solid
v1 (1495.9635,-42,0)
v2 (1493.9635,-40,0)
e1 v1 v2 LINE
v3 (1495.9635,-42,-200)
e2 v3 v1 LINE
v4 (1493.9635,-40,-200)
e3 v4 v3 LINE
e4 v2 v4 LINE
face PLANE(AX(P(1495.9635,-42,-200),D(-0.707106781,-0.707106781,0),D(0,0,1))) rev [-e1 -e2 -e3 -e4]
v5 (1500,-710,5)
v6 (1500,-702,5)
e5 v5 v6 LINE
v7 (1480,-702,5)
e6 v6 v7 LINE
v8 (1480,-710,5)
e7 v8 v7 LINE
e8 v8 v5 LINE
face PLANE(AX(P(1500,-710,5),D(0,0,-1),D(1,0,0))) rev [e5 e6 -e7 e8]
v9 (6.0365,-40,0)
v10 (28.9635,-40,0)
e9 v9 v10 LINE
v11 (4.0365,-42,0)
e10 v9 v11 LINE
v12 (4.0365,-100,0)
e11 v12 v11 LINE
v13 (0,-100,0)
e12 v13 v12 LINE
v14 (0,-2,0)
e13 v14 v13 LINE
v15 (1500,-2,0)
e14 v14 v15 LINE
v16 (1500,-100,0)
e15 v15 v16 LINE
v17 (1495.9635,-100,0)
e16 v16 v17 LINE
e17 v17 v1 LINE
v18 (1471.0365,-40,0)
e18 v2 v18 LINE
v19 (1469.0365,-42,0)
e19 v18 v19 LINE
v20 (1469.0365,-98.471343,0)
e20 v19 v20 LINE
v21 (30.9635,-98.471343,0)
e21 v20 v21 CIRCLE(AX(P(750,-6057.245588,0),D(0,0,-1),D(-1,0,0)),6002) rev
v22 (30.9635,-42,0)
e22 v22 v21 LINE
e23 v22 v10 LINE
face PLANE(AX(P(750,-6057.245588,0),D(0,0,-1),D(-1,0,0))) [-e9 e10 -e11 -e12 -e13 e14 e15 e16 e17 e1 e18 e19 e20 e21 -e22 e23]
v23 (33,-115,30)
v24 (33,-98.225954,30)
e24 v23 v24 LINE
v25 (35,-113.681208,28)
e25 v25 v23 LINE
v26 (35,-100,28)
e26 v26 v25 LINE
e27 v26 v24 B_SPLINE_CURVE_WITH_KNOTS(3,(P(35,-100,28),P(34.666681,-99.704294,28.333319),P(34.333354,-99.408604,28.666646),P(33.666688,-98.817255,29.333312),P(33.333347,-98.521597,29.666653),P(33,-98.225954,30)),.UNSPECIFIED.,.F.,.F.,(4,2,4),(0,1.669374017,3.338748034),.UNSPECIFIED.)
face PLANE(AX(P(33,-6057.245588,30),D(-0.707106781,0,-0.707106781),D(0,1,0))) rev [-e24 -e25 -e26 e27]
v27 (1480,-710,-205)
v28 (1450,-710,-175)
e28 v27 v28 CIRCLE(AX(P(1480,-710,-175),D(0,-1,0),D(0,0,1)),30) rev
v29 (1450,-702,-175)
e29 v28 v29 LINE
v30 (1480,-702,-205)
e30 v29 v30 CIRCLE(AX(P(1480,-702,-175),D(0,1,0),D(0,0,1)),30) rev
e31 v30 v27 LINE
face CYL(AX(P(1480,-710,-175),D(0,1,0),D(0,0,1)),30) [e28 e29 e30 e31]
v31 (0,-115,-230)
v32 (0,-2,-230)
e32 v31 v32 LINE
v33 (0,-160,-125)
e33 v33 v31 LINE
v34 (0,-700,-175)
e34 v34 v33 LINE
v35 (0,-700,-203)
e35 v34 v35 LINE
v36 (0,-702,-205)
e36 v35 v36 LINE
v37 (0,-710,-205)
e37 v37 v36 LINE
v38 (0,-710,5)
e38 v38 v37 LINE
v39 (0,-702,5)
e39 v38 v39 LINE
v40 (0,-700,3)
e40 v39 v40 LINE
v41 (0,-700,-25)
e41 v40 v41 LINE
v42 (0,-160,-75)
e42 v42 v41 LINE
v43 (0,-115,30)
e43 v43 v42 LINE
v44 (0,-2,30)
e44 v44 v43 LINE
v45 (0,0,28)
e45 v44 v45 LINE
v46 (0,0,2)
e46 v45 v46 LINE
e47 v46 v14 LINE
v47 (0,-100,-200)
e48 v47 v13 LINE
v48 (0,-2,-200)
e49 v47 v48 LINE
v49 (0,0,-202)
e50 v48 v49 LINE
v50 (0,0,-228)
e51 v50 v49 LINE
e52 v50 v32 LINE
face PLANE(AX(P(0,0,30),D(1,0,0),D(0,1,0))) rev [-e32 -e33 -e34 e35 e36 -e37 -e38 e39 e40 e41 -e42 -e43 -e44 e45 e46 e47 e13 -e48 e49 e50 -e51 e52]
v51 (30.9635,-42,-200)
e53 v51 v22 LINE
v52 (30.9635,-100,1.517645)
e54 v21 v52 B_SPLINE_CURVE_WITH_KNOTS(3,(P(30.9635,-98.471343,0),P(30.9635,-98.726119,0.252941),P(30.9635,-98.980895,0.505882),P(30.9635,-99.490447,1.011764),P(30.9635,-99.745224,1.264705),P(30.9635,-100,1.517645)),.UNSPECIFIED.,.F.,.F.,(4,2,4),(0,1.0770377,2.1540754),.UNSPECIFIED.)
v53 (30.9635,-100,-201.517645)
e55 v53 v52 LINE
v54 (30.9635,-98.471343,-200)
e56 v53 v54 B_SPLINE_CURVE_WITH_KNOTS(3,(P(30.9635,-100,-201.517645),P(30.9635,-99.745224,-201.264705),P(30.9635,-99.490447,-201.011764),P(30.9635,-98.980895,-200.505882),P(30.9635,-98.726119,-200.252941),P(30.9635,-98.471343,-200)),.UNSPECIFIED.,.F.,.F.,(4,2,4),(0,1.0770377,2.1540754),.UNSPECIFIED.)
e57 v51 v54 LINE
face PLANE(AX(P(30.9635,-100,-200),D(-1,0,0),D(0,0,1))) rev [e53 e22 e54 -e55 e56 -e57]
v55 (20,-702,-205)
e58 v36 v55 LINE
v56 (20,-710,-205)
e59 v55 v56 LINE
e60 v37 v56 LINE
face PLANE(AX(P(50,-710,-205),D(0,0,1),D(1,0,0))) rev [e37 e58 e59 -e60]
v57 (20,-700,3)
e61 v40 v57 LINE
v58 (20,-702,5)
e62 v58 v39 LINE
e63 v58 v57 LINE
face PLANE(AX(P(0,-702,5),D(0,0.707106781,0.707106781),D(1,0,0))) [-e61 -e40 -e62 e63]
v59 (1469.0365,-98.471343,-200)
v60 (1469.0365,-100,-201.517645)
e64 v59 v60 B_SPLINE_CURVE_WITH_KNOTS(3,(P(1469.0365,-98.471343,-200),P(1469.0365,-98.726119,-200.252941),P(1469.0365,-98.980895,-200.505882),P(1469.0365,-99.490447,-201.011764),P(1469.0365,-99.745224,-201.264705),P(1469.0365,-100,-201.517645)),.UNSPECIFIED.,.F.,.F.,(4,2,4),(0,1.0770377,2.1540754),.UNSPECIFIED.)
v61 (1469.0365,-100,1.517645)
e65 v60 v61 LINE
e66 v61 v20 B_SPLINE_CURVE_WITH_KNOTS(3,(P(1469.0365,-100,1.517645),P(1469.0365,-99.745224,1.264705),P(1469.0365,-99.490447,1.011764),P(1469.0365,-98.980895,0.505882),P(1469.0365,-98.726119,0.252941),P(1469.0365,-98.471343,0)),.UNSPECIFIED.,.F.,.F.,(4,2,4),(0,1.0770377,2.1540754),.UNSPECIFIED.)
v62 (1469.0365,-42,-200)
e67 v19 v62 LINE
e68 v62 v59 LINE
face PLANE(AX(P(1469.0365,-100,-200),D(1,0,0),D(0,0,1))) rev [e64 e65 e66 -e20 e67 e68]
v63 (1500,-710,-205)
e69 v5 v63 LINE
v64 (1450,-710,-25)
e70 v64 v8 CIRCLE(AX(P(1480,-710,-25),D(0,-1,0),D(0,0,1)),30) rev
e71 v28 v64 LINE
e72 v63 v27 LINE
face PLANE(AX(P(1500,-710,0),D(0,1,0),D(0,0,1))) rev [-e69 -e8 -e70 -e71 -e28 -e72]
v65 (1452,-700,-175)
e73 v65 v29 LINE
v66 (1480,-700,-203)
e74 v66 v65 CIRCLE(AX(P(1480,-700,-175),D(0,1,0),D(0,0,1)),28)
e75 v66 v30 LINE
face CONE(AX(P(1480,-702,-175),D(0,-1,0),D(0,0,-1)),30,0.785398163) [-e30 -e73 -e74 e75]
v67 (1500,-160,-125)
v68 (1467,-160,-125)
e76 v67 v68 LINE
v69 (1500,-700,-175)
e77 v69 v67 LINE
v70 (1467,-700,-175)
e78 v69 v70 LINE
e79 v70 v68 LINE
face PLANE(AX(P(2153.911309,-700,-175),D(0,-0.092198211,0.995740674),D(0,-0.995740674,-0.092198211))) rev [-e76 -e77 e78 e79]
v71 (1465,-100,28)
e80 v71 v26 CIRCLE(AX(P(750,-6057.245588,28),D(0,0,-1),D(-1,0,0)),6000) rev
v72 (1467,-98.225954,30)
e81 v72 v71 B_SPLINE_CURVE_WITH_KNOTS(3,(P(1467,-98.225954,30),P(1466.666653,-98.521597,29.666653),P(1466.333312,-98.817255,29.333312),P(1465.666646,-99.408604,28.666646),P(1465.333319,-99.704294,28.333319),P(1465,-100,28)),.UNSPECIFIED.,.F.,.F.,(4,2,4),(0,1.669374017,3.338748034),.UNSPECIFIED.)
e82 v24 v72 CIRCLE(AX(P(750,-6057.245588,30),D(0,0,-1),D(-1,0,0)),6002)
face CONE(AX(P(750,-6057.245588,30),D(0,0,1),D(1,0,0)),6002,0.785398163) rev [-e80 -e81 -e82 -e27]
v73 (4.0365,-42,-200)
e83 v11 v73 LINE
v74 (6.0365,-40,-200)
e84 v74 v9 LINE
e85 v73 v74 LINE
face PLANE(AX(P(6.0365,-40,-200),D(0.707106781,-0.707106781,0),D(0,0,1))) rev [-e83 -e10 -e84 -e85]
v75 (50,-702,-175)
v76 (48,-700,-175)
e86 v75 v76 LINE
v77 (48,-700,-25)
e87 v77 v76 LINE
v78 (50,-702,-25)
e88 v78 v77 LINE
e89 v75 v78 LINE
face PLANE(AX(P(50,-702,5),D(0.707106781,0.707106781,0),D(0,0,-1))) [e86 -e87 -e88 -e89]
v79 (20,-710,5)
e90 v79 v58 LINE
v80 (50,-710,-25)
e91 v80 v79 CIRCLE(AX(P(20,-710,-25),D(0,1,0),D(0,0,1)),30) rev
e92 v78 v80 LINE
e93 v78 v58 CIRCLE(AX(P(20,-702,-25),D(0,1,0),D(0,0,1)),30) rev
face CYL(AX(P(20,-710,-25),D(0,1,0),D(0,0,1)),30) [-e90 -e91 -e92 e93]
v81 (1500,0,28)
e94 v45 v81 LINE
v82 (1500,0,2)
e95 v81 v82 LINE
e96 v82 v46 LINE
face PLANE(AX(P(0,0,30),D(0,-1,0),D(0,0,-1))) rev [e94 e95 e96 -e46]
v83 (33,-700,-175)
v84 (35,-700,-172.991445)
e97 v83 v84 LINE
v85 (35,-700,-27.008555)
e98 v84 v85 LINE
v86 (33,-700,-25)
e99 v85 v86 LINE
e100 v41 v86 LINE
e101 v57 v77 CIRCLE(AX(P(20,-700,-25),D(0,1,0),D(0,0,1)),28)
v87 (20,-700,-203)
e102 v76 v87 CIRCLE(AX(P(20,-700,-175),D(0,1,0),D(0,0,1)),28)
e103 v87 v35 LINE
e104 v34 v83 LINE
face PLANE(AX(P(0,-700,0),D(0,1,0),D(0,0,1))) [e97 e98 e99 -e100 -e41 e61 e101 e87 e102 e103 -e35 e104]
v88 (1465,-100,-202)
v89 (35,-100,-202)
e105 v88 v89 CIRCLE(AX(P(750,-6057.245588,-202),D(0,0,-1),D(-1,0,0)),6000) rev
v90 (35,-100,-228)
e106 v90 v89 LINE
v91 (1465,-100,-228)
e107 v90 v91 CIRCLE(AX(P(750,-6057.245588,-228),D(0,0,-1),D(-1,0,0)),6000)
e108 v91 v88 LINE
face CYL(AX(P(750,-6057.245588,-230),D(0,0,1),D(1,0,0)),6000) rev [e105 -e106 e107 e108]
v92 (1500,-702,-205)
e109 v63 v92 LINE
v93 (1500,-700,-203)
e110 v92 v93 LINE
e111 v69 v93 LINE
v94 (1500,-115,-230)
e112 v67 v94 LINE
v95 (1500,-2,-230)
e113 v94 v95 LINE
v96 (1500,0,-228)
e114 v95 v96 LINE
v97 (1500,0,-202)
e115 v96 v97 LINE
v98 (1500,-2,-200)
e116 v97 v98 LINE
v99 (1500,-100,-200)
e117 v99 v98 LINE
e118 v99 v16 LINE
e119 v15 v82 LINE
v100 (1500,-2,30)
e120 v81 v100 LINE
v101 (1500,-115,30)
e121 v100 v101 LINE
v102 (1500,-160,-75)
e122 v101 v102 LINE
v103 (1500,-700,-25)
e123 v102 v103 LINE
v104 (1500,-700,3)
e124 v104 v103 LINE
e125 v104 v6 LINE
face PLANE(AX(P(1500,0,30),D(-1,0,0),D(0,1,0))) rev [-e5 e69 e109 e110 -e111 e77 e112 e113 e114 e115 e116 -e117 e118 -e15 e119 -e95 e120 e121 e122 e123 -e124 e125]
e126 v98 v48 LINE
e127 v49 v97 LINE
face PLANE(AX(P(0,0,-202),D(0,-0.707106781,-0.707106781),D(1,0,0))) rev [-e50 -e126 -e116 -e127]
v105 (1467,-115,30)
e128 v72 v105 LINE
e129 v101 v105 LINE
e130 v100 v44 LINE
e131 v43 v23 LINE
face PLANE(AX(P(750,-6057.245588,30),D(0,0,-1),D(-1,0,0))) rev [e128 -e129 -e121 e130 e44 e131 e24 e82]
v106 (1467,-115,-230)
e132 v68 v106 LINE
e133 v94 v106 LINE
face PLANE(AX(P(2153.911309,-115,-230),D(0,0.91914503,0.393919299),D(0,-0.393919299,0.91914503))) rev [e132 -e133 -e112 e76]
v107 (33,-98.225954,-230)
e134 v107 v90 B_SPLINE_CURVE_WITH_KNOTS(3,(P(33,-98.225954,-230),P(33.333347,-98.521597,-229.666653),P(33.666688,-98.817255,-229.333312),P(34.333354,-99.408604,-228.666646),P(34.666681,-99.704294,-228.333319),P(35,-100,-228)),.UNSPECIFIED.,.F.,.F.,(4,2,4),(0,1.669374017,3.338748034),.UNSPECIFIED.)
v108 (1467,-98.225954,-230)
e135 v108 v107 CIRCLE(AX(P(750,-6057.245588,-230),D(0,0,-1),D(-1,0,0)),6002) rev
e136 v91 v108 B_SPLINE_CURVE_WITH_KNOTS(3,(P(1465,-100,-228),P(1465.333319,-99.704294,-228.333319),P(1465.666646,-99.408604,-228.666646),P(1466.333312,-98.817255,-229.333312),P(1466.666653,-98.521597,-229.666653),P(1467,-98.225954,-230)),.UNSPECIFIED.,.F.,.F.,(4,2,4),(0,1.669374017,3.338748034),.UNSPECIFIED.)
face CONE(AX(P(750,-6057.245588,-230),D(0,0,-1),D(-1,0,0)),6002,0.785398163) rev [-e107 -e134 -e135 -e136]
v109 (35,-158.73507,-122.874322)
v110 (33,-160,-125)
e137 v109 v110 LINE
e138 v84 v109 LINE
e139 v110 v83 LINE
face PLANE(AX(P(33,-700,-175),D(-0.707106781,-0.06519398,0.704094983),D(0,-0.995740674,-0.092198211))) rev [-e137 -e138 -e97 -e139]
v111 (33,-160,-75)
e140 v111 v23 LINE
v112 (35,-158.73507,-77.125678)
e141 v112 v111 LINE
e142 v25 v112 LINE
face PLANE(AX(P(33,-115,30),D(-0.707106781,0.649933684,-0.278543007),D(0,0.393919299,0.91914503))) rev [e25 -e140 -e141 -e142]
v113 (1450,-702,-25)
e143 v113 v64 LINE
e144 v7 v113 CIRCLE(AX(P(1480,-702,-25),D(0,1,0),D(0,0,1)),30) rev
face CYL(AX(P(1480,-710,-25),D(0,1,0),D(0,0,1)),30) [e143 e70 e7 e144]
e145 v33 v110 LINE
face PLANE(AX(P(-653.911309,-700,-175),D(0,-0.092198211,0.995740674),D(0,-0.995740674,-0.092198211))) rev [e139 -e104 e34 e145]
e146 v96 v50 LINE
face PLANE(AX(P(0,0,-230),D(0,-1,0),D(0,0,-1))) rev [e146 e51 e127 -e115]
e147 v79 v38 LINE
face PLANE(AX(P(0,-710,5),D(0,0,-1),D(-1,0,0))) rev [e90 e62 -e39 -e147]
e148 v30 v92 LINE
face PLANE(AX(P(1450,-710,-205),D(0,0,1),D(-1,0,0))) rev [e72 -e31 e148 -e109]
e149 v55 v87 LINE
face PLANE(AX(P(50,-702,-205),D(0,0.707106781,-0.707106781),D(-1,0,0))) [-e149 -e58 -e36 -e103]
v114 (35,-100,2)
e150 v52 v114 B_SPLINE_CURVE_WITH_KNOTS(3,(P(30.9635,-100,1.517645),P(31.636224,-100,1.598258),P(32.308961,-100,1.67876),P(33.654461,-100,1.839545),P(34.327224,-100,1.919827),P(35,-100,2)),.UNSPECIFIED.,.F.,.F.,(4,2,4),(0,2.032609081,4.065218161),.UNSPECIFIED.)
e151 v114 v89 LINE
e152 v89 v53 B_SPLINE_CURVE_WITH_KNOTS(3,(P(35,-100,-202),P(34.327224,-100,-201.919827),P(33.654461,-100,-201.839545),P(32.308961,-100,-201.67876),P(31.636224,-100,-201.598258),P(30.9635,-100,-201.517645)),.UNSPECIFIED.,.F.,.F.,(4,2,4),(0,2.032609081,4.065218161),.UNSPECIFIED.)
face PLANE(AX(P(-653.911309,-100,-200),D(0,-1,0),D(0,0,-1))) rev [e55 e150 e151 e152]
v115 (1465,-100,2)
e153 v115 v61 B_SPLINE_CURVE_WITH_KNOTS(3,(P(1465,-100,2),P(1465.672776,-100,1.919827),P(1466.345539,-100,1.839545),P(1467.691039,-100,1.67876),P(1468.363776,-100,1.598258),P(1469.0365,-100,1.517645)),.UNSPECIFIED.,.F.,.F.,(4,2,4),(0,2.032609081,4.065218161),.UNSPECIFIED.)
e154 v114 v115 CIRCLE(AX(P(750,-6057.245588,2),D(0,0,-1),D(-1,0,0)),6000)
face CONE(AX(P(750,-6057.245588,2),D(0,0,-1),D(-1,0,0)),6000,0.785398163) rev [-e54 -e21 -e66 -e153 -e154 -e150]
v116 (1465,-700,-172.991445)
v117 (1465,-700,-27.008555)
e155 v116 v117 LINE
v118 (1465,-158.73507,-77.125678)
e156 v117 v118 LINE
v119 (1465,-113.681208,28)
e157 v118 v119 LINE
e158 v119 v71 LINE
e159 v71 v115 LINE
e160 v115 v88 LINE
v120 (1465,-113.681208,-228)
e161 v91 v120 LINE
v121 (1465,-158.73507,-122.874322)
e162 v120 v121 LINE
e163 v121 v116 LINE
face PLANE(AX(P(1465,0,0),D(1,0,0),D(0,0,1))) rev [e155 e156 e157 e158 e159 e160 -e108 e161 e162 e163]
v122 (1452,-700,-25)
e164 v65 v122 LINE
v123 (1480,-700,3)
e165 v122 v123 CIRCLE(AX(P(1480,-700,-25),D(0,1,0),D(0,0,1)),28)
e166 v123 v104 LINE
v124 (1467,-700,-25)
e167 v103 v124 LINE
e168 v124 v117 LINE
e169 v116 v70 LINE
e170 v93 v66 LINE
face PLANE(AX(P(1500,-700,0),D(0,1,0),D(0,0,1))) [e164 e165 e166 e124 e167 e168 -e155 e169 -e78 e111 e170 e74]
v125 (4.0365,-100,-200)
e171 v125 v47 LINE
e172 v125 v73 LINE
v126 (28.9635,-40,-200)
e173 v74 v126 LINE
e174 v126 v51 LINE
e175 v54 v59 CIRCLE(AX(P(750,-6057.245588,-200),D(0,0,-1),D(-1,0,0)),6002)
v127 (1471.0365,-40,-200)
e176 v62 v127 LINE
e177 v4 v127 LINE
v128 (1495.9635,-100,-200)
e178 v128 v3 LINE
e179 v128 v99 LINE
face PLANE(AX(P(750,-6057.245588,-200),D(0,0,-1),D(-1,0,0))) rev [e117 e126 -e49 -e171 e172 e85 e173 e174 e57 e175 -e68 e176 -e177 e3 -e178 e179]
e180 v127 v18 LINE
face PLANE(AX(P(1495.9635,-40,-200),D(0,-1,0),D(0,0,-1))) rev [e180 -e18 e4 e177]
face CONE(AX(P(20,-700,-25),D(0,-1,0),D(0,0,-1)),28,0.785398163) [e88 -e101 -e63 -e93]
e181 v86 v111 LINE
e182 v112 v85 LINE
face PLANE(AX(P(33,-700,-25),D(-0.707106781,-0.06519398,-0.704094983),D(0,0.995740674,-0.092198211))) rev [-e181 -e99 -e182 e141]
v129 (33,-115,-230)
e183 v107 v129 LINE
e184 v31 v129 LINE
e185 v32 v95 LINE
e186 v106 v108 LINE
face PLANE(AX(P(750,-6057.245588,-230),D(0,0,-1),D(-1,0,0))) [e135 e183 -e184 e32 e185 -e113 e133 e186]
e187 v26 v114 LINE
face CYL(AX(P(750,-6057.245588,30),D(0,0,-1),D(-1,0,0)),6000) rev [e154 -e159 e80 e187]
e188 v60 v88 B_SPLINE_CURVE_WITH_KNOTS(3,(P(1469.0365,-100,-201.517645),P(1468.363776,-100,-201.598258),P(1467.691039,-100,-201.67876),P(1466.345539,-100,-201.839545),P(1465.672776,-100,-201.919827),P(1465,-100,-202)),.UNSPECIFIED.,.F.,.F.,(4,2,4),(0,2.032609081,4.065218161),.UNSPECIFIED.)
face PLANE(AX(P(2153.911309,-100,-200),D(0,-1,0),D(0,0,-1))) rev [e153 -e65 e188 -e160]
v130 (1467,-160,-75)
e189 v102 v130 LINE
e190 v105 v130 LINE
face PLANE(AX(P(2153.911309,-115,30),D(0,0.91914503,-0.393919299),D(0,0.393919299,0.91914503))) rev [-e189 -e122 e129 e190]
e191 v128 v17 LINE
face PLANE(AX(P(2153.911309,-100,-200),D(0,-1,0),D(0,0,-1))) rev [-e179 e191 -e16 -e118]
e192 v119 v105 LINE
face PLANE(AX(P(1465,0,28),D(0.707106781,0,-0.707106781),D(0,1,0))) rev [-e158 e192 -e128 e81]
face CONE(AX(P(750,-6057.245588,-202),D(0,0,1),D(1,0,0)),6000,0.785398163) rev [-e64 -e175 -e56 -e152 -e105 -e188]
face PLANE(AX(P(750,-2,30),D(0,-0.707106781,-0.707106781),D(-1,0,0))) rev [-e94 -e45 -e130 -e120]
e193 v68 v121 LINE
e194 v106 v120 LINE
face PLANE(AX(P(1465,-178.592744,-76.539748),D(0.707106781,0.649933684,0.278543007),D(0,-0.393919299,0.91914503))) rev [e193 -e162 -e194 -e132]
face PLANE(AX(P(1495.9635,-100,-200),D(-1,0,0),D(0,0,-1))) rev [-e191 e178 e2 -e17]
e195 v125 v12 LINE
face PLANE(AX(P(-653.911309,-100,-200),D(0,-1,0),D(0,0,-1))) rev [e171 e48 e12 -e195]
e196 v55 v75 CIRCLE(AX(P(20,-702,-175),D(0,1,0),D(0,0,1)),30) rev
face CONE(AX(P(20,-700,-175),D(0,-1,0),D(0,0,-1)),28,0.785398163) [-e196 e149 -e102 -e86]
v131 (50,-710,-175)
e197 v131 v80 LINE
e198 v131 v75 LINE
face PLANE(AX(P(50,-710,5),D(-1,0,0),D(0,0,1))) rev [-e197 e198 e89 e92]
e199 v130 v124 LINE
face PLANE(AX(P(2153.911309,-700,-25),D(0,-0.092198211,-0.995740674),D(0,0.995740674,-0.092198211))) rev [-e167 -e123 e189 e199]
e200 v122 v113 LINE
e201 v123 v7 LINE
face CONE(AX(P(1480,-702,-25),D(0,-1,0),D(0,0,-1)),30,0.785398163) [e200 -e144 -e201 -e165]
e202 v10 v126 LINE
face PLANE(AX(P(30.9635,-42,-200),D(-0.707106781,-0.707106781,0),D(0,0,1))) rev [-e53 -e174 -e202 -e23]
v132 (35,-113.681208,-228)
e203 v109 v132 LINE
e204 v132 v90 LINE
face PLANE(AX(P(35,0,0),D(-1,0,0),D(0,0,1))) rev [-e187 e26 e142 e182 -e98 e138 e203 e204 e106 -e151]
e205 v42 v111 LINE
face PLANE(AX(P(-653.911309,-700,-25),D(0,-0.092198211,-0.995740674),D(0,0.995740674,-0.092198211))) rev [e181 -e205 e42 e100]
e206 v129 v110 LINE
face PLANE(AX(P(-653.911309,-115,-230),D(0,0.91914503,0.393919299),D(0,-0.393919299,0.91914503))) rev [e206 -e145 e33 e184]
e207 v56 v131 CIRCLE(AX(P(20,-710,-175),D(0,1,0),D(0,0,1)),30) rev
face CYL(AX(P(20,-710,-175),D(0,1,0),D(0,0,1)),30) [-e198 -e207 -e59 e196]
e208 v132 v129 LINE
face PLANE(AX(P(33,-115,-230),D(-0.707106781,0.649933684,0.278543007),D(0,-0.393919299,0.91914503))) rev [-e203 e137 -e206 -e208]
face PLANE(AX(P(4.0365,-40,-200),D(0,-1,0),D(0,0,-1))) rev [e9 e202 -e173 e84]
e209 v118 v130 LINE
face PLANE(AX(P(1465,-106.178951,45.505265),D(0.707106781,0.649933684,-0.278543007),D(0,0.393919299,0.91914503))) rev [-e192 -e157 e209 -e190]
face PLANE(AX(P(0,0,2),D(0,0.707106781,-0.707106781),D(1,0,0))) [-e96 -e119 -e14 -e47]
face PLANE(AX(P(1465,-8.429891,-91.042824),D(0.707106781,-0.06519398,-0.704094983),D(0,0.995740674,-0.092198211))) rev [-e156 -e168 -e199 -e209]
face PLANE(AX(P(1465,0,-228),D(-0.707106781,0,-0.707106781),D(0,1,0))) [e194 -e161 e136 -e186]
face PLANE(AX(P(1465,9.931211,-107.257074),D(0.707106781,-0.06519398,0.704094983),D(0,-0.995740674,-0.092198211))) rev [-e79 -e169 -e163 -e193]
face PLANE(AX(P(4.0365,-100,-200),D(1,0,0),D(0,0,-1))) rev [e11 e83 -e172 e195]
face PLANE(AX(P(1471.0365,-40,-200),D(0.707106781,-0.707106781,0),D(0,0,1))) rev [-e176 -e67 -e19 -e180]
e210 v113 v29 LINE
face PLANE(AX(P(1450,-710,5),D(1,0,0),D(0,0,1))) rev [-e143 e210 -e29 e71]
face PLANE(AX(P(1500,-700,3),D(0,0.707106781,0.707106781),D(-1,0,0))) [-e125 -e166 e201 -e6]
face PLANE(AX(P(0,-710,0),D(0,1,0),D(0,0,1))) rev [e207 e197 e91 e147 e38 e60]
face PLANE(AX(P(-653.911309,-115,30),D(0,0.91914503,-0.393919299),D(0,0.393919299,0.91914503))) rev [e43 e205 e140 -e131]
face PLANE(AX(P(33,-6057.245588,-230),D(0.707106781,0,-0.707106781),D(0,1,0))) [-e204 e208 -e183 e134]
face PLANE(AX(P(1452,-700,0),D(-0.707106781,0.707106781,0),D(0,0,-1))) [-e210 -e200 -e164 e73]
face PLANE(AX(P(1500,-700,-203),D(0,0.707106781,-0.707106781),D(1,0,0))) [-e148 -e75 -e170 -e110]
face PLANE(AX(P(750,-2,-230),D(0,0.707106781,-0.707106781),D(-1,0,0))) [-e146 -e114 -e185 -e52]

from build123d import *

# Parameters (mm, degrees)
BOSS_EXTRUDE1_DEPTH      = 30
SKETCH2_W                = 26.926999998
SKETCH2_H                = 60
BOSS_EXTRUDE2_DEPTH      = 200
BOSS_EXTRUDE3_START      = 30
BOSS_EXTRUDE3_DEPTH      = 30
BOSS_EXTRUDE4_DEPTH      = 4.0365
BOSS_EXTRUDE4_DEPTH_BACK = 30.9635
BOSS_EXTRUDE5_DEPTH      = 10
FILLET1_R                = 30
SKETCH7_W                = 260
SKETCH7_H                = 710
CUT_EXTRUDE1_DEPTH       = 1059.06427026
CHAMFER1_SIZE            = 2
CHAMFER2_SIZE            = 2
CHAMFER3_SIZE            = 2
CHAMFER4_SIZE            = 2
CHAMFER6_SIZE            = 2


with BuildPart() as part:
    # Sketch1 → Boss-Extrude1 (new body)
    with BuildSketch(Plane.XY):
        with BuildLine():
            Line((0, 0), (1500, 0))
            Line((1500, 0), (1500, -100))
            Line((1500, -100), (1465, -100))
            ThreePointArc((1465, -100), (750, -57.245588357), (35, -100))
            Line((35, -100), (0, -100))
            Line((0, -100), (0, 0))
        make_face()
    extrude(amount=BOSS_EXTRUDE1_DEPTH)

    # Sketch2 → Boss-Extrude2 (add)
    with BuildSketch(Plane(origin=(0, 0, 0), x_dir=(-1, 0, 0), z_dir=(0, 0, -1))):
        with Locations((-1482.5, -70)):
            Rectangle(SKETCH2_W, SKETCH2_H)
        with Locations((-17.5, -70)):
            Rectangle(SKETCH2_W, SKETCH2_H)
    extrude(amount=BOSS_EXTRUDE2_DEPTH)

    # Sketch3 → Boss-Extrude3 (add)
    with BuildSketch(Plane(origin=(0, 0, -200), x_dir=(-1, 0, 0), z_dir=(0, 0, -1)).offset(BOSS_EXTRUDE3_START)):
        with BuildLine():
            Line((0, -100), (0, 0))
            Line((0, 0), (-1500, 0))
            Line((-1500, 0), (-1500, -100))
            Line((-1500, -100), (-1465, -100))
            ThreePointArc((-1465, -100), (-750, -57.245588357), (-35, -100))
            Line((-35, -100), (0, -100))
        make_face()
    extrude(amount=-BOSS_EXTRUDE3_DEPTH)

    # Sketch5 → Boss-Extrude4 (add, two sides: drawn at the far end of the back side and taken through both)
    with BuildSketch(Plane.ZY.offset(-4.036500001).offset(-BOSS_EXTRUDE4_DEPTH_BACK)):
        Polygon((-200, -100), (0, -100), (30, -100), (30, -115), (-75, -160), (-25, -700), (-100, -700), (-175, -700), (-125, -160), (-230, -115), (-230, -100), align=None)
    extrude(amount=BOSS_EXTRUDE4_DEPTH + BOSS_EXTRUDE4_DEPTH_BACK)

    # Sketch6 → Boss-Extrude5 (add)
    with BuildSketch(Plane.XZ.offset(700)):
        Polygon((0, -25), (0, 5), (50, 5), (50, -205), (0, -205), (0, -175), align=None)
    extrude(amount=BOSS_EXTRUDE5_DEPTH)

    # Fillet1
    fillet1_edges = [part.edges().sort_by_distance(p)[0] for p in [
        (50, -705, -205),
        (50, -705, 5),
    ]]
    fillet(fillet1_edges, radius=FILLET1_R)

    # Sketch7 → Cut-Extrude1 (cut, through all)
    with BuildSketch(Plane(origin=(750, 0, 0), x_dir=(0, 0, -1), z_dir=(1, 0, 0))):
        with Locations((100, -355)):
            Rectangle(SKETCH7_W, SKETCH7_H)
    extrude(amount=CUT_EXTRUDE1_DEPTH, mode=Mode.SUBTRACT)

    # Mirror2: part across plane


with BuildPart() as part_1:
    add(part.part)
    add(part.part.mirror(Plane(origin=(750, 0, 0), x_dir=(0, 0, 1), z_dir=(1, 0, 0))))

    # Chamfer1
    chamfer1_edges = [part_1.edges().sort_by_distance(p)[0] for p in [
        (750, 0, 30),
        (750, 0, 0),
        (750, 0, -200),
        (750, 0, -230),
    ]]
    chamfer(chamfer1_edges, length=CHAMFER1_SIZE)

    # Chamfer2
    chamfer2_edges = [part_1.edges().sort_by_distance(p)[0] for p in [
        (1495.963499999, -40, -100),
        (1469.036500001, -40, -100),
        (4.036500001, -40, -100),
        (30.963499999, -40, -100),
    ]]
    chamfer(chamfer2_edges, length=CHAMFER2_SIZE)

    # Chamfer3
    chamfer3_edges = [part_1.edges().sort_by_distance(p)[0] for p in [
        (1464.999999999, -107.5, -230),
        (1464.999999999, -137.5, -177.5),
        (1464.999999999, -430, -150),
        (1464.999999999, -430, -50),
        (1464.999999999, -137.5, -22.5),
        (1464.999999999, -107.5, 30),
        (35.000000001, -107.5, 30),
        (35.000000001, -137.5, -22.5),
        (35.000000001, -430, -50),
        (35.000000001, -430, -150),
        (35.000000001, -137.5, -177.5),
        (35.000000001, -107.5, -230),
    ]]
    chamfer(chamfer3_edges, length=CHAMFER3_SIZE)

    # Chamfer4
    chamfer4_edges = [part_1.edges().sort_by_distance(p)[0] for p in [
        (50, -700, -100),
        (10, -700, 5),
        (41.213203436, -700, -3.786796564),
        (41.213203436, -700, -196.213203436),
        (1450, -700, -100),
        (1490, -700, 5),
        (1490, -700, -205),
        (1458.786796564, -700, -196.213203436),
        (1458.786796564, -700, -3.786796564),
        (10, -700, -205),
    ]]
    chamfer(chamfer4_edges, length=CHAMFER4_SIZE)

    # Chamfer6
    # the kernel refuses this chamfer: 2 mm, written as the material it takes off along each edge
    with BuildSketch(Plane(origin=(750, -6057.245588357, 30), x_dir=(0.1203510488799101, 0.9927313962162704, 0), z_dir=(0.9927313962162704, -0.1203510488799101, 0))) as chamfer6_piece_1_section:
        Polygon((6000 + CHAMFER6_SIZE, 0), (6000, -CHAMFER6_SIZE), (6000, 0), align=None)
    chamfer6_piece_1 = revolve(axis=Axis((750, -6057.245588357, 30), (0, 0, 1)), revolution_arc=13.824726066, mode=Mode.PRIVATE)
    chamfer6_piece_1 = split(chamfer6_piece_1, bisect_by=Plane(origin=(1466.125003015, -99.334691053, 29.125003016), z_dir=(-0.7071067811865476, 0, 0.7071067811865476)), keep=Keep.TOP, mode=Mode.PRIVATE)
    chamfer6_piece_1 = split(chamfer6_piece_1, bisect_by=Plane(origin=(749.625001683, -99.334691053, -686.625001682), z_dir=(0.7071067811865476, 0, 0.7071067811865476)), keep=Keep.TOP, mode=Mode.PRIVATE)
    add(chamfer6_piece_1, mode=Mode.SUBTRACT)
    with BuildSketch(Plane(origin=(750, -6057.245588357, -200), x_dir=(-0.12001774996908876, 0.9927717460183672, 0), z_dir=(-0.9927717460183672, -0.12001774996908876, 0))) as chamfer6_piece_2_section:
        Polygon((6000 + CHAMFER6_SIZE, 0), (6000, CHAMFER6_SIZE), (6000, 0), align=None)
    chamfer6_piece_2 = revolve(axis=Axis((750, -6057.245588357, -200), (0, 0, -1)), revolution_arc=13.786253962, mode=Mode.PRIVATE)
    chamfer6_piece_2 = split(chamfer6_piece_2, bisect_by=Plane(origin=(33.165042668, -100, -200.593649662), z_dir=(0, 1, 0)), keep=Keep.TOP, mode=Mode.PRIVATE)
    chamfer6_piece_2 = split(chamfer6_piece_2, bisect_by=Plane(origin=(1469.036500001, -99.402070314, -200.593649662), z_dir=(-1, 0, 0)), keep=Keep.TOP, mode=Mode.PRIVATE)
    chamfer6_piece_2 = split(chamfer6_piece_2, bisect_by=Plane(origin=(30.963499999, -99.402070314, -200.593649662), z_dir=(1, 0, 0)), keep=Keep.TOP, mode=Mode.PRIVATE)
    add(chamfer6_piece_2, mode=Mode.SUBTRACT)
    with BuildSketch(Plane(origin=(750, -6057.245588357, 0), x_dir=(0.12001774996908958, 0.9927717460183672, 0), z_dir=(0.9927717460183672, -0.12001774996908958, 0))) as chamfer6_piece_3_section:
        Polygon((6000 + CHAMFER6_SIZE, 0), (6000, CHAMFER6_SIZE), (6000, 0), align=None)
    chamfer6_piece_3 = revolve(axis=Axis((750, -6057.245588357, 0), (0, 0, 1)), revolution_arc=13.786253962, mode=Mode.PRIVATE)
    chamfer6_piece_3 = split(chamfer6_piece_3, bisect_by=Plane(origin=(1466.834957332, -100, 0.593649662), z_dir=(0, 1, 0)), keep=Keep.TOP, mode=Mode.PRIVATE)
    chamfer6_piece_3 = split(chamfer6_piece_3, bisect_by=Plane(origin=(1469.036500001, -99.402070314, 0.593649662), z_dir=(-1, 0, 0)), keep=Keep.TOP, mode=Mode.PRIVATE)
    chamfer6_piece_3 = split(chamfer6_piece_3, bisect_by=Plane(origin=(30.963499999, -99.402070314, 0.593649662), z_dir=(1, 0, 0)), keep=Keep.TOP, mode=Mode.PRIVATE)
    add(chamfer6_piece_3, mode=Mode.SUBTRACT)
    with BuildSketch(Plane(origin=(750, -6057.245588357, -230), x_dir=(-0.12035104887990915, 0.9927313962162705, 0), z_dir=(-0.9927313962162705, -0.12035104887990915, 0))) as chamfer6_piece_4_section:
        Polygon((6000 + CHAMFER6_SIZE, 0), (6000, -CHAMFER6_SIZE), (6000, 0), align=None)
    chamfer6_piece_4 = revolve(axis=Axis((750, -6057.245588357, -230), (0, 0, -1)), revolution_arc=13.824726066, mode=Mode.PRIVATE)
    chamfer6_piece_4 = split(chamfer6_piece_4, bisect_by=Plane(origin=(750.374998317, -99.334691053, 486.625001682), z_dir=(-0.7071067811865476, 0, -0.7071067811865476)), keep=Keep.TOP, mode=Mode.PRIVATE)
    chamfer6_piece_4 = split(chamfer6_piece_4, bisect_by=Plane(origin=(33.874996985, -99.334691053, -229.125003016), z_dir=(0.7071067811865476, 0, -0.7071067811865476)), keep=Keep.TOP, mode=Mode.PRIVATE)
    add(chamfer6_piece_4, mode=Mode.SUBTRACT)


solid = part_1.part
